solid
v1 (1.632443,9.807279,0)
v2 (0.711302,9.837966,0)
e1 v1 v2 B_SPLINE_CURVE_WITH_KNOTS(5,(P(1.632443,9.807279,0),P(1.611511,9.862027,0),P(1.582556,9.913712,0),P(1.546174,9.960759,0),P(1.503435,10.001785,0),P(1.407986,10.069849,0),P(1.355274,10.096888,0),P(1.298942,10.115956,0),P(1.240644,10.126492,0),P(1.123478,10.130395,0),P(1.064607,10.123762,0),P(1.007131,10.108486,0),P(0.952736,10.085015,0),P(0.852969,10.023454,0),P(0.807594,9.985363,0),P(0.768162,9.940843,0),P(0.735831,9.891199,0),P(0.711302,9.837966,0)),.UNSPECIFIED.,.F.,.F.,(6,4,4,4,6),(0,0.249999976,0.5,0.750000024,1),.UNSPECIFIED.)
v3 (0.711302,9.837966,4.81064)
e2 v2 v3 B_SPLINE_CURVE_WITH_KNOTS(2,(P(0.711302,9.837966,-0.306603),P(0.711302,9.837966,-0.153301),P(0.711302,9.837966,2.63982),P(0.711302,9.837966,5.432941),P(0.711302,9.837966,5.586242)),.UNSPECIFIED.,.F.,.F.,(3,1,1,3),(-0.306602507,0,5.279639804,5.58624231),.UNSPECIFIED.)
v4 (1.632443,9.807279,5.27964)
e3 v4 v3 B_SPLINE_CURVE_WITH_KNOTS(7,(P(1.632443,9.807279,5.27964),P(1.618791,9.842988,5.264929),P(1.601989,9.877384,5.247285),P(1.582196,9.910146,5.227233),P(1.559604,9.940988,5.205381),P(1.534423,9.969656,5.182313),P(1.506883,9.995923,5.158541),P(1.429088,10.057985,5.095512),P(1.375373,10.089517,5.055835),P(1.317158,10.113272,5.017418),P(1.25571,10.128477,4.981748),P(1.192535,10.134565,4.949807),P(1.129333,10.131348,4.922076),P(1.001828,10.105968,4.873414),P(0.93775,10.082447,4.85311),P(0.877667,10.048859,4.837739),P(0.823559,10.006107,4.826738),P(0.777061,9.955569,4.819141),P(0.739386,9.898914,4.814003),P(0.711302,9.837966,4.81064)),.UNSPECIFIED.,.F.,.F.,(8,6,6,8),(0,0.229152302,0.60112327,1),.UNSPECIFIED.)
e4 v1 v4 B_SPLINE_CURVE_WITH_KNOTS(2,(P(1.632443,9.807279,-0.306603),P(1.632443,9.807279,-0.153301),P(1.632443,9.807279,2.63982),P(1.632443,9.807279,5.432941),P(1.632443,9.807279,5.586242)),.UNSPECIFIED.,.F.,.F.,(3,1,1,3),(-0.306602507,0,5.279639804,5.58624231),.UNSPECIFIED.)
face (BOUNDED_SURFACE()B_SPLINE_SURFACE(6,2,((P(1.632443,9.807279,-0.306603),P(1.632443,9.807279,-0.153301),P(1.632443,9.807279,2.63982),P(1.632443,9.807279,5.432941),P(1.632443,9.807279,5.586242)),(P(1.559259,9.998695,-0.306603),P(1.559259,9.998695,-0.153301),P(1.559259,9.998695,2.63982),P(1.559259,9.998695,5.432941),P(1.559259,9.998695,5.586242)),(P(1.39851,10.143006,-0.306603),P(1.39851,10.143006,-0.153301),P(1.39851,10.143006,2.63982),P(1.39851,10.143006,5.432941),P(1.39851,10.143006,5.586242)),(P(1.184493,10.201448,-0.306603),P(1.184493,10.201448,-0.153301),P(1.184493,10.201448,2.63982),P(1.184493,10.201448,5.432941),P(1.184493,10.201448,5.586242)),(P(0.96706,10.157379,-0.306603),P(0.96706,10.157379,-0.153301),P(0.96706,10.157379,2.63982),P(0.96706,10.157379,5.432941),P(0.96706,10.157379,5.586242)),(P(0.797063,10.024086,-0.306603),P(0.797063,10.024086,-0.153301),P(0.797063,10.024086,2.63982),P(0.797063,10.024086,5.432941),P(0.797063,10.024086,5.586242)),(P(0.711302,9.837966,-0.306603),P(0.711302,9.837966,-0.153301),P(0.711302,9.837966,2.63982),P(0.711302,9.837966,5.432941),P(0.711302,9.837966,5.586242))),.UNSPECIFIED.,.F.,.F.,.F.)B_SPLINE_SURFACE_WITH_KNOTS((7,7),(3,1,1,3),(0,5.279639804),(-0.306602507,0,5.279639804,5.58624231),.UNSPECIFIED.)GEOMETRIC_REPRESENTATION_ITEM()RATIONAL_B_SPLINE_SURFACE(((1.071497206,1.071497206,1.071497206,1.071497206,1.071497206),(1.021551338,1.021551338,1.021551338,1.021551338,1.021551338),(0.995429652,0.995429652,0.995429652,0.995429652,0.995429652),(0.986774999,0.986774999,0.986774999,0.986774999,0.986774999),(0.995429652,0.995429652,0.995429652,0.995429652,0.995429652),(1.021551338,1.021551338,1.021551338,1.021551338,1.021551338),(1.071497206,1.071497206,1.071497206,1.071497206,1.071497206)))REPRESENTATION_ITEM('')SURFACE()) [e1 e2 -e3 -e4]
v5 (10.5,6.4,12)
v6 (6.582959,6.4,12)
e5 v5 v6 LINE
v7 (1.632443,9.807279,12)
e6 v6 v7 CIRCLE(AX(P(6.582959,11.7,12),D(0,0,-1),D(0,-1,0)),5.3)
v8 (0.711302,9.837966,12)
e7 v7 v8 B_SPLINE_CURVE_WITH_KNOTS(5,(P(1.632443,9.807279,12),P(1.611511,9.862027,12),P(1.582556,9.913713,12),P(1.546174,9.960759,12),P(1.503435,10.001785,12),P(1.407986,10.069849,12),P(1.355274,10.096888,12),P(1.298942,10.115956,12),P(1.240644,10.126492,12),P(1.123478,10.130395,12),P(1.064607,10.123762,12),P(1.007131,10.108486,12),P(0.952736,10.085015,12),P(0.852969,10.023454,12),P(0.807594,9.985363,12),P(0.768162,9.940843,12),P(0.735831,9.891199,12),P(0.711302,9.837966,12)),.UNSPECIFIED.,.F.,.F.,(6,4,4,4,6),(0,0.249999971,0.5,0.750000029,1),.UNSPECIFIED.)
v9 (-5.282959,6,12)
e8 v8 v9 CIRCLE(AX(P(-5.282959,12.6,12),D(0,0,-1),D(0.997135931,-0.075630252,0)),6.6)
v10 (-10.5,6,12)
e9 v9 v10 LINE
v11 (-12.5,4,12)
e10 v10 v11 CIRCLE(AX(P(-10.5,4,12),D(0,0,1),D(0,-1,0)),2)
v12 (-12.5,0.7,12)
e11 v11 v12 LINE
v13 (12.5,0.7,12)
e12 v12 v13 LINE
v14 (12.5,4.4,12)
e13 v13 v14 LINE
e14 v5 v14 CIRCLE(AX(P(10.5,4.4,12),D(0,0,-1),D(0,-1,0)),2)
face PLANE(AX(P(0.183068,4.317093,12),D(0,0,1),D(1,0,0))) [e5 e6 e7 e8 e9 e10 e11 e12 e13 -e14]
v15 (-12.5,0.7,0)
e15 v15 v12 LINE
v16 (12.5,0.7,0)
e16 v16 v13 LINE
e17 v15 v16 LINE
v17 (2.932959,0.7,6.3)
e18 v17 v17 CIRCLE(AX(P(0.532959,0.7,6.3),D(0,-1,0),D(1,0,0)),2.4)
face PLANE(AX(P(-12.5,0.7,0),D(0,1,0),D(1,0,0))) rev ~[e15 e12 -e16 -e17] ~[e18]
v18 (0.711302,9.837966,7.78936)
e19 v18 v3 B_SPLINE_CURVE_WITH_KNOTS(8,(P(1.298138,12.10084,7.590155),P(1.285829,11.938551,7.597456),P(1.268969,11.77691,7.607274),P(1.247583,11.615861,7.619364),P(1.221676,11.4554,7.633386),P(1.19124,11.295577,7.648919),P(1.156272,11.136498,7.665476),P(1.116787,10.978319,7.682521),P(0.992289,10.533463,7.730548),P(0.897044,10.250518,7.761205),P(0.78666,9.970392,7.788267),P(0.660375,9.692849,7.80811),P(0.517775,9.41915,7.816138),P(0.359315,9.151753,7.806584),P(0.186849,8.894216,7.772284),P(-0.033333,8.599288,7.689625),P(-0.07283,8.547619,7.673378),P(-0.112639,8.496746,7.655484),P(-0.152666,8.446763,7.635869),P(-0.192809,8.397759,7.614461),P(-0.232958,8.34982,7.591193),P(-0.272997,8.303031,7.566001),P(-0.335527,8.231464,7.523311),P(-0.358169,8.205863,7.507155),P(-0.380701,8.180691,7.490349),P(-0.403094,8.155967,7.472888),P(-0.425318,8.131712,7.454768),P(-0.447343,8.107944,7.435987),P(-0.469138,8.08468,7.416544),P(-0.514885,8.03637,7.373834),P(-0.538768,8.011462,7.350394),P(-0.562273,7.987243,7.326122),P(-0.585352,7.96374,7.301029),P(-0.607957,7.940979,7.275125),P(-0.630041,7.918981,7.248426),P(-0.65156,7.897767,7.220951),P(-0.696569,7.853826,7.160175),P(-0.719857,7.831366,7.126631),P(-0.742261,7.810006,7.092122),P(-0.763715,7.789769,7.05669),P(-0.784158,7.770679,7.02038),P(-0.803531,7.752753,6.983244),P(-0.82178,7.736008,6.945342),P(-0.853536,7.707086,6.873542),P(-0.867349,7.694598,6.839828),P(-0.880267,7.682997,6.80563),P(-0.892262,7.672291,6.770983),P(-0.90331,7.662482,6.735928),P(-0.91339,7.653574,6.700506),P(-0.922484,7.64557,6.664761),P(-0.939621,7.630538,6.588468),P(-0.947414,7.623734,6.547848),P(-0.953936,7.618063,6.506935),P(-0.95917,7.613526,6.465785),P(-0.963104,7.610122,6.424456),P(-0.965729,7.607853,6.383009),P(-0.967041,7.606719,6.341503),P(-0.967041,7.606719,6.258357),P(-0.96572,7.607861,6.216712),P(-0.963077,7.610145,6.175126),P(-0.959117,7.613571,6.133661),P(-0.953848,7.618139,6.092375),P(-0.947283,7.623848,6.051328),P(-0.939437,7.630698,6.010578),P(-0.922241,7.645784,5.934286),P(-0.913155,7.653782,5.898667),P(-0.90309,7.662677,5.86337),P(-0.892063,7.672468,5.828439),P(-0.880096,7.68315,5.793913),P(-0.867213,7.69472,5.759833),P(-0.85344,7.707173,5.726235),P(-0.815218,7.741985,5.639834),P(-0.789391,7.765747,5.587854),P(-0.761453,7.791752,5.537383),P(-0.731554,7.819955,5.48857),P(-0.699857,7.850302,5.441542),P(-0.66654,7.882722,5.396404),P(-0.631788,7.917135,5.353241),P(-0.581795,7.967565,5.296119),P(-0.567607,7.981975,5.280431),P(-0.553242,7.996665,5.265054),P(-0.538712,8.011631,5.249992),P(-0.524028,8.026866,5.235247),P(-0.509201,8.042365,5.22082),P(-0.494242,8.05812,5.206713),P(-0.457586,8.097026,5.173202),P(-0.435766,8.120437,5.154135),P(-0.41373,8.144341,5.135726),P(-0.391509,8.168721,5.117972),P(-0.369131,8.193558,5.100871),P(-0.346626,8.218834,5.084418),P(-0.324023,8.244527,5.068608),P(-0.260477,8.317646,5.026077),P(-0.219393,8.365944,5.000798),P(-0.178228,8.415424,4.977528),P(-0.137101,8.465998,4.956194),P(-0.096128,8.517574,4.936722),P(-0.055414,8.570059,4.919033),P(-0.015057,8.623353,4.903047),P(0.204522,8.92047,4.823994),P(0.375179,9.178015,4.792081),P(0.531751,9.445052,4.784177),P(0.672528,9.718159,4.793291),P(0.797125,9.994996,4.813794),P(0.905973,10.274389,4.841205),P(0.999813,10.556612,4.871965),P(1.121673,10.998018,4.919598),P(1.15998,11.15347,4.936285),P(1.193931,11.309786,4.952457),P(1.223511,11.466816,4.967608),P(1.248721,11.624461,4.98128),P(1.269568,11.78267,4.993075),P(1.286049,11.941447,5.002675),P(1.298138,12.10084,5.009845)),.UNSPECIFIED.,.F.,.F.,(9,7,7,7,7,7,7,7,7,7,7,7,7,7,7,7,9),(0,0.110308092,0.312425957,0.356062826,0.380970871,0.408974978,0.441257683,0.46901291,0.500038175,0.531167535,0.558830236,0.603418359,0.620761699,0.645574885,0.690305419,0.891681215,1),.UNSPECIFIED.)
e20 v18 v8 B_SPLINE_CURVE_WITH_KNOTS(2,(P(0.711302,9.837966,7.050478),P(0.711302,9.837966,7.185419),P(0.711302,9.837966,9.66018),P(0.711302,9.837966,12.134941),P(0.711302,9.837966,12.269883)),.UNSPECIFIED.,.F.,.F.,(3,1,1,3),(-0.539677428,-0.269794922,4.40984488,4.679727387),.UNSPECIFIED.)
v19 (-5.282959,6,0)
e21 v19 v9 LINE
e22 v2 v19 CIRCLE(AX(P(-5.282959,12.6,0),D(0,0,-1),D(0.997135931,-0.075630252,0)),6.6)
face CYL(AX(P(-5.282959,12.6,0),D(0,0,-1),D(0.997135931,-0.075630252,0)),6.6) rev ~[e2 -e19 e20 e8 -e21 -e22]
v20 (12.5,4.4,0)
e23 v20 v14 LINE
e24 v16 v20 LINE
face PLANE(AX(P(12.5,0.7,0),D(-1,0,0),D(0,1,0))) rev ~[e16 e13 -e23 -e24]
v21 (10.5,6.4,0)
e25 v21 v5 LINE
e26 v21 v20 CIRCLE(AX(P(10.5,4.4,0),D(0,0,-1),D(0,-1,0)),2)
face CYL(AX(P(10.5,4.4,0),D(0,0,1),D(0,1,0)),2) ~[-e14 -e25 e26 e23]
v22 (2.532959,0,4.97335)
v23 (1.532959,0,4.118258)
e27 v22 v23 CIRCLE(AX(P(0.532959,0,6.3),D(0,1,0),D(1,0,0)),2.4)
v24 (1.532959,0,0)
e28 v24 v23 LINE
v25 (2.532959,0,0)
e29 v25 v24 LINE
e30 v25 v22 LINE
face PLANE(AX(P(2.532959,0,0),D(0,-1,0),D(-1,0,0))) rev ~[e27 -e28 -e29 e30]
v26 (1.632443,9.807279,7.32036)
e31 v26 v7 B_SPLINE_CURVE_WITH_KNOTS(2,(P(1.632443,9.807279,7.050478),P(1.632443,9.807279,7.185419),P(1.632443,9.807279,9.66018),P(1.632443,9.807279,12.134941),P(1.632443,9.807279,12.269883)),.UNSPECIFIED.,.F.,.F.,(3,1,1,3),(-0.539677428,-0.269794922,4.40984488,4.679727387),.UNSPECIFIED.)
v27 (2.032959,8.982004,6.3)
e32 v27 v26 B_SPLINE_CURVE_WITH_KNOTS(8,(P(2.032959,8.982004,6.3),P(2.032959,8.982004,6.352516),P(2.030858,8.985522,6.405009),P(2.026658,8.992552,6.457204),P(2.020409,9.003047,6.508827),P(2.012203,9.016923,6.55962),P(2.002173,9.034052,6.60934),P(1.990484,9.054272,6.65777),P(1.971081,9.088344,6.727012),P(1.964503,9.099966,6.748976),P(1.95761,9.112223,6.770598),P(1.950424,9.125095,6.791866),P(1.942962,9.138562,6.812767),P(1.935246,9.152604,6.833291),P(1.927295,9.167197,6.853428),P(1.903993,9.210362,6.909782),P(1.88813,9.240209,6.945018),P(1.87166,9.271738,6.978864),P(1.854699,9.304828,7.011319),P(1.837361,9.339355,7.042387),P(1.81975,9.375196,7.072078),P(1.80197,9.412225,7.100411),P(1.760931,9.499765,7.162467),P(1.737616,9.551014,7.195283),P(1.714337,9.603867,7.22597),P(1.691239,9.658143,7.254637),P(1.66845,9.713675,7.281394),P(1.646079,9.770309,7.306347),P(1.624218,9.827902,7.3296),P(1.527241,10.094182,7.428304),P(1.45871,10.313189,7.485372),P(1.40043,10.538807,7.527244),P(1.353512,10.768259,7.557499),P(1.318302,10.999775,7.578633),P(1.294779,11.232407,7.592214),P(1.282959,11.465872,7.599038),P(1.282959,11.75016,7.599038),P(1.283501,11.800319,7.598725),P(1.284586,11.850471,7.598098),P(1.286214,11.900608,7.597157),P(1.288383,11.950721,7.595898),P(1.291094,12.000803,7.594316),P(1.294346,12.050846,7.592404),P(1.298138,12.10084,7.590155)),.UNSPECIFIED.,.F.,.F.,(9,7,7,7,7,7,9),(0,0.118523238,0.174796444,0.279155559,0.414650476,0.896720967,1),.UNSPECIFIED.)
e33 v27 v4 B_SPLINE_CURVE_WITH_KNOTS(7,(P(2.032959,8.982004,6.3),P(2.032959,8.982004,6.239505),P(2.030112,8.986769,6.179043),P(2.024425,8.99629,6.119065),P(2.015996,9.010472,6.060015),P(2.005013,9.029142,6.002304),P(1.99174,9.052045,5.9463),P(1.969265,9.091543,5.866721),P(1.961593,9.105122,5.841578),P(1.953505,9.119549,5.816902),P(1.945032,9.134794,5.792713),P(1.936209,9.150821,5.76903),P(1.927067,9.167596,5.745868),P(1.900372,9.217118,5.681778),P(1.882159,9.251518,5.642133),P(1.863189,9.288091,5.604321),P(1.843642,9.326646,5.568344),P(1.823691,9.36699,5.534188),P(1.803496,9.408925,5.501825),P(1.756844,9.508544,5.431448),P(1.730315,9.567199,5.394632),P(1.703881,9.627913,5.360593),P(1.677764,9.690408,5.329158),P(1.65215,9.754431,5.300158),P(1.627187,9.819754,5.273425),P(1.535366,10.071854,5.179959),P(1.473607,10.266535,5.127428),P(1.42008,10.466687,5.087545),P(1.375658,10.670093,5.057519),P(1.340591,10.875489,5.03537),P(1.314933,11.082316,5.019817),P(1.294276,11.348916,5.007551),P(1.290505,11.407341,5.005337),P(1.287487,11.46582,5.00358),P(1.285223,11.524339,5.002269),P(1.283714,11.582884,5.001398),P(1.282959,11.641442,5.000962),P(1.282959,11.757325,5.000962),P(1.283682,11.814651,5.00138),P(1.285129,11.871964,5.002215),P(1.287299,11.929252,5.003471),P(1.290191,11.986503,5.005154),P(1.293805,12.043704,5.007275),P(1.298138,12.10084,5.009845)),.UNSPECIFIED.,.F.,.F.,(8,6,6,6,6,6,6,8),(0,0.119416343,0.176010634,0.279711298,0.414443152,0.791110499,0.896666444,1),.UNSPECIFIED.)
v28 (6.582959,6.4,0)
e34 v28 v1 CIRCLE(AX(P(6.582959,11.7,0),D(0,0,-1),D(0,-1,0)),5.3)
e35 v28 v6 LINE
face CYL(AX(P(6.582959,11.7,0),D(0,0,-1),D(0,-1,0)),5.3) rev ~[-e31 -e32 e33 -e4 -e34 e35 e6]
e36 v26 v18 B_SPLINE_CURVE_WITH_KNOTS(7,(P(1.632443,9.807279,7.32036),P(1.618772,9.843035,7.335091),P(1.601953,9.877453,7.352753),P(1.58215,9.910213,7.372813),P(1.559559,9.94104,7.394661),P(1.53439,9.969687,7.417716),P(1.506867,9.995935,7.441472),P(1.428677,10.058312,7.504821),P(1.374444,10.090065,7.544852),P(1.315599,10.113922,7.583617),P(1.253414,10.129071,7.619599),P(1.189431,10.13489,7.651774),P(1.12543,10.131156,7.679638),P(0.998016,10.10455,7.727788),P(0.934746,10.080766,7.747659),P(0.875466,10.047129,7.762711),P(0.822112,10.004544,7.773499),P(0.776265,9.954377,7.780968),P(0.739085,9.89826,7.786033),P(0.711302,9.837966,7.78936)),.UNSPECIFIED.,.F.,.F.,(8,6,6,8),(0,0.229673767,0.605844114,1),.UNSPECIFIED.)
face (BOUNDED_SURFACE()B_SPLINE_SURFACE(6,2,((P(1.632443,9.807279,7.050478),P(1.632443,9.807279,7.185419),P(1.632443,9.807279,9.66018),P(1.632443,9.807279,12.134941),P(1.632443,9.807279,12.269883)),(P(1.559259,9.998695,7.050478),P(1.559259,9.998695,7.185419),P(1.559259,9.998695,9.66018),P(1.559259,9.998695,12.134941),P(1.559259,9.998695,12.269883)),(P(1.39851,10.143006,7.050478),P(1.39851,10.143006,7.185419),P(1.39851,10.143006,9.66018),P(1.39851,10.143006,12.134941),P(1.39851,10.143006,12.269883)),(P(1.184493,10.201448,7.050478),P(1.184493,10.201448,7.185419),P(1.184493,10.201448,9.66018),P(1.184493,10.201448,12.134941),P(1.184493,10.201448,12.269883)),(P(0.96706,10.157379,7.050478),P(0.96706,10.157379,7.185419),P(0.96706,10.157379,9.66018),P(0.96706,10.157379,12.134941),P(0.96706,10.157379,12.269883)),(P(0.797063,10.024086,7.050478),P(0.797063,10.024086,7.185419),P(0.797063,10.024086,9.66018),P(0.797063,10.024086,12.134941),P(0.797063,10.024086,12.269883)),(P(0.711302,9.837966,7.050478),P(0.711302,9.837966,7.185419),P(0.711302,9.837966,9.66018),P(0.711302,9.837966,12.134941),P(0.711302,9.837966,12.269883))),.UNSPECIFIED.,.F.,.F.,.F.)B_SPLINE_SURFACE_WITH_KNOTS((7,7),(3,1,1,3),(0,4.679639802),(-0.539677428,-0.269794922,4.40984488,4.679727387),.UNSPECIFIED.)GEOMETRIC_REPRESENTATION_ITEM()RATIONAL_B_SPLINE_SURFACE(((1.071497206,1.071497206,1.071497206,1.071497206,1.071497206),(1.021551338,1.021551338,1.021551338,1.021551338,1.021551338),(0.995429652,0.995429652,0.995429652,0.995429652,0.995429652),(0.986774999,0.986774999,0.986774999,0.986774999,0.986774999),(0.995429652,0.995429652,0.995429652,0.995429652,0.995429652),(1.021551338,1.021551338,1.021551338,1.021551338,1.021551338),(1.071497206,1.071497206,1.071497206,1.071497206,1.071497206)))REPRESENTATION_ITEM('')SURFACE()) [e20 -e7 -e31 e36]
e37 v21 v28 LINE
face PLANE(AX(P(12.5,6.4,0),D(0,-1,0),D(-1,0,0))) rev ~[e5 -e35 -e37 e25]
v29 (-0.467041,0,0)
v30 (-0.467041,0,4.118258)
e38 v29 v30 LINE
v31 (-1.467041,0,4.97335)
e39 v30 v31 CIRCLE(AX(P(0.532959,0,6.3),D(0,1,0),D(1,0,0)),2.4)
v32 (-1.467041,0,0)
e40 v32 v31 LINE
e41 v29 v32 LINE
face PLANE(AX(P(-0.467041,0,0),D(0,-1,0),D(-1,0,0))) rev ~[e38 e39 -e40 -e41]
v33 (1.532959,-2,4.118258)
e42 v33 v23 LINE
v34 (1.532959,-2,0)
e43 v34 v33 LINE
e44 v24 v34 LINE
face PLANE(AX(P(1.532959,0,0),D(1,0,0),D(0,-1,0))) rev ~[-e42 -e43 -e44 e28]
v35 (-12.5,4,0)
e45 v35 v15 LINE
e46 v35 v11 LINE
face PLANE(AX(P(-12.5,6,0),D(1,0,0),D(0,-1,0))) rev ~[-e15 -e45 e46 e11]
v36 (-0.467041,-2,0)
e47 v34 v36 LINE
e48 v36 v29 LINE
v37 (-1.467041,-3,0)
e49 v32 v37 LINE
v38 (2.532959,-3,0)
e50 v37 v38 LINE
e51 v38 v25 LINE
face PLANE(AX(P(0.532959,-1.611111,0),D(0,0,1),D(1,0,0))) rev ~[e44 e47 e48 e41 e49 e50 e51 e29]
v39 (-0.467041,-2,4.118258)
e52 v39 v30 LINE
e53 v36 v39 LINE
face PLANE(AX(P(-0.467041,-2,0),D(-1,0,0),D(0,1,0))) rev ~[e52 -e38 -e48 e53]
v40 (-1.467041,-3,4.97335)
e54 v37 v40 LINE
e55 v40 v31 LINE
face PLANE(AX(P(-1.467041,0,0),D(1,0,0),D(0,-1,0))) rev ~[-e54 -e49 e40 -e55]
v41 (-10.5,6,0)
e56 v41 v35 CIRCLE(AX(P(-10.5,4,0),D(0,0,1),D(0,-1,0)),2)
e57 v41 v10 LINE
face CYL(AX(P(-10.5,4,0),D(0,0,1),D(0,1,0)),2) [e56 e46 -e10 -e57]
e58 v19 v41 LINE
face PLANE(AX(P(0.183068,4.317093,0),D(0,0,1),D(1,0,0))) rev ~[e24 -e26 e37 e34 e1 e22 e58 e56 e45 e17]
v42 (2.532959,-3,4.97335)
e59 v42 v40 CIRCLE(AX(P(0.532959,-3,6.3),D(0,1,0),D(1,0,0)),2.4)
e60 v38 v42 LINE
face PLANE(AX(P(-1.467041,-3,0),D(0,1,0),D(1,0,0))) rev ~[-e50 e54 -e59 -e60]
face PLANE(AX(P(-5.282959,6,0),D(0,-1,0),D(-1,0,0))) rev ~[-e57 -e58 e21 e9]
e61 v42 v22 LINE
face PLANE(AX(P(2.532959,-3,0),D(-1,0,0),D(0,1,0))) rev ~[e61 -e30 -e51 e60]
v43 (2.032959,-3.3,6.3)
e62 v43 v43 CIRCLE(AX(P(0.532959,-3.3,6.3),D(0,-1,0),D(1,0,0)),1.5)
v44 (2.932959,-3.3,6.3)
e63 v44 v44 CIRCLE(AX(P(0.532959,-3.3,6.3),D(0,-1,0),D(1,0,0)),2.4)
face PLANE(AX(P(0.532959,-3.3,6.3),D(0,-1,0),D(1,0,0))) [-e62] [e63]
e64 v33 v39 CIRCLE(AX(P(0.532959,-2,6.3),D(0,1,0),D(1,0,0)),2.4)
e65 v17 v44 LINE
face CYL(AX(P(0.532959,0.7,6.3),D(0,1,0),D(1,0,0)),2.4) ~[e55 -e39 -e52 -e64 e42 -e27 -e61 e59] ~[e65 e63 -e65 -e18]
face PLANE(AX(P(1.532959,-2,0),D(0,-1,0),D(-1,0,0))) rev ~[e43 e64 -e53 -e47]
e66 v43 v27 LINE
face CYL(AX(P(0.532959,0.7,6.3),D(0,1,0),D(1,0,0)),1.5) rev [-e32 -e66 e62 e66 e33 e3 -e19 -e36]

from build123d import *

# Parameters (mm, degrees)
F1_DEPTH = 12
F2_R     = 1.5
F3_DEPTH = 25
F4_R     = 0.5
F5_R     = 2
F2_R_2   = 2.4
F6_DEPTH = 4


# Not quite as in the source:
# - a feature names something its author has since deleted; it is built from what else it names


with BuildPart() as f1:
    # F0 (on Top) → F1 (new body)
    with BuildSketch(Plane.XY):
        with BuildLine():
            Line((12.5, 6.4), (6.5829587897, 6.4))
            ThreePointArc((6.5829587897, 6.4), (2.6961571623, 8.0968384564), (1.2981383552, 12.100840336))
            ThreePointArc((1.2981383552, 12.100840336), (-0.7960029052, 7.7598319357), (-5.2829587897, 6))
            Line((-5.2829587897, 6), (-12.5, 6))
            Line((-12.5, 6), (-12.5, 0.7))
            Line((-12.5, 0.7), (12.5, 0.7))
            Line((12.5, 0.7), (12.5, 6.4))
        make_face()
    extrude(amount=F1_DEPTH)

    # F2 (on face) → F3 (cut)
    with BuildSketch(Plane.XZ.offset(-0.7)):
        with Locations((0.5329587897, 6.3)):
            Circle(F2_R)
    extrude(amount=-F3_DEPTH, mode=Mode.SUBTRACT)

    # F4
    f4_edges = [f1.edges().sort_by_distance(p)[0] for p in [
        (1.298138, 12.10084, 9.795078),
        (1.298138, 12.10084, 2.504922),
    ]]
    fillet(f4_edges, radius=F4_R)

    # F5
    f5_edges = [f1.edges().sort_by_distance(p)[0] for p in [
        (-12.5, 6, 6),
        (12.5, 6.4, 6),
    ]]
    fillet(f5_edges, radius=F5_R)

    # F2 (on face) → F6 (join)
    with BuildSketch(Plane.XZ.offset(-0.7)):
        with Locations((0.5329587897, 6.3)):
            Circle(F2_R_2)
        with Locations((0.5329587897, 6.3)):
            Circle(F2_R, mode=Mode.SUBTRACT)
    extrude(amount=F6_DEPTH)

    # F0 (on Top) → F7 (join, up to the next surface of F1)
    with BuildSketch(Plane.XY):
        Polygon((-0.4670412103, 0), (-1.4670412103, 0), (-1.4670412103, -2), (-1.4670412103, -3), (2.5329587897, -3), (2.5329587897, -2), (2.5329587897, 0), (1.5329587897, 0), (1.5329587897, -2), (-0.4670412103, -2), align=None)
    extrude(until=Until.NEXT)


solid = f1.part
